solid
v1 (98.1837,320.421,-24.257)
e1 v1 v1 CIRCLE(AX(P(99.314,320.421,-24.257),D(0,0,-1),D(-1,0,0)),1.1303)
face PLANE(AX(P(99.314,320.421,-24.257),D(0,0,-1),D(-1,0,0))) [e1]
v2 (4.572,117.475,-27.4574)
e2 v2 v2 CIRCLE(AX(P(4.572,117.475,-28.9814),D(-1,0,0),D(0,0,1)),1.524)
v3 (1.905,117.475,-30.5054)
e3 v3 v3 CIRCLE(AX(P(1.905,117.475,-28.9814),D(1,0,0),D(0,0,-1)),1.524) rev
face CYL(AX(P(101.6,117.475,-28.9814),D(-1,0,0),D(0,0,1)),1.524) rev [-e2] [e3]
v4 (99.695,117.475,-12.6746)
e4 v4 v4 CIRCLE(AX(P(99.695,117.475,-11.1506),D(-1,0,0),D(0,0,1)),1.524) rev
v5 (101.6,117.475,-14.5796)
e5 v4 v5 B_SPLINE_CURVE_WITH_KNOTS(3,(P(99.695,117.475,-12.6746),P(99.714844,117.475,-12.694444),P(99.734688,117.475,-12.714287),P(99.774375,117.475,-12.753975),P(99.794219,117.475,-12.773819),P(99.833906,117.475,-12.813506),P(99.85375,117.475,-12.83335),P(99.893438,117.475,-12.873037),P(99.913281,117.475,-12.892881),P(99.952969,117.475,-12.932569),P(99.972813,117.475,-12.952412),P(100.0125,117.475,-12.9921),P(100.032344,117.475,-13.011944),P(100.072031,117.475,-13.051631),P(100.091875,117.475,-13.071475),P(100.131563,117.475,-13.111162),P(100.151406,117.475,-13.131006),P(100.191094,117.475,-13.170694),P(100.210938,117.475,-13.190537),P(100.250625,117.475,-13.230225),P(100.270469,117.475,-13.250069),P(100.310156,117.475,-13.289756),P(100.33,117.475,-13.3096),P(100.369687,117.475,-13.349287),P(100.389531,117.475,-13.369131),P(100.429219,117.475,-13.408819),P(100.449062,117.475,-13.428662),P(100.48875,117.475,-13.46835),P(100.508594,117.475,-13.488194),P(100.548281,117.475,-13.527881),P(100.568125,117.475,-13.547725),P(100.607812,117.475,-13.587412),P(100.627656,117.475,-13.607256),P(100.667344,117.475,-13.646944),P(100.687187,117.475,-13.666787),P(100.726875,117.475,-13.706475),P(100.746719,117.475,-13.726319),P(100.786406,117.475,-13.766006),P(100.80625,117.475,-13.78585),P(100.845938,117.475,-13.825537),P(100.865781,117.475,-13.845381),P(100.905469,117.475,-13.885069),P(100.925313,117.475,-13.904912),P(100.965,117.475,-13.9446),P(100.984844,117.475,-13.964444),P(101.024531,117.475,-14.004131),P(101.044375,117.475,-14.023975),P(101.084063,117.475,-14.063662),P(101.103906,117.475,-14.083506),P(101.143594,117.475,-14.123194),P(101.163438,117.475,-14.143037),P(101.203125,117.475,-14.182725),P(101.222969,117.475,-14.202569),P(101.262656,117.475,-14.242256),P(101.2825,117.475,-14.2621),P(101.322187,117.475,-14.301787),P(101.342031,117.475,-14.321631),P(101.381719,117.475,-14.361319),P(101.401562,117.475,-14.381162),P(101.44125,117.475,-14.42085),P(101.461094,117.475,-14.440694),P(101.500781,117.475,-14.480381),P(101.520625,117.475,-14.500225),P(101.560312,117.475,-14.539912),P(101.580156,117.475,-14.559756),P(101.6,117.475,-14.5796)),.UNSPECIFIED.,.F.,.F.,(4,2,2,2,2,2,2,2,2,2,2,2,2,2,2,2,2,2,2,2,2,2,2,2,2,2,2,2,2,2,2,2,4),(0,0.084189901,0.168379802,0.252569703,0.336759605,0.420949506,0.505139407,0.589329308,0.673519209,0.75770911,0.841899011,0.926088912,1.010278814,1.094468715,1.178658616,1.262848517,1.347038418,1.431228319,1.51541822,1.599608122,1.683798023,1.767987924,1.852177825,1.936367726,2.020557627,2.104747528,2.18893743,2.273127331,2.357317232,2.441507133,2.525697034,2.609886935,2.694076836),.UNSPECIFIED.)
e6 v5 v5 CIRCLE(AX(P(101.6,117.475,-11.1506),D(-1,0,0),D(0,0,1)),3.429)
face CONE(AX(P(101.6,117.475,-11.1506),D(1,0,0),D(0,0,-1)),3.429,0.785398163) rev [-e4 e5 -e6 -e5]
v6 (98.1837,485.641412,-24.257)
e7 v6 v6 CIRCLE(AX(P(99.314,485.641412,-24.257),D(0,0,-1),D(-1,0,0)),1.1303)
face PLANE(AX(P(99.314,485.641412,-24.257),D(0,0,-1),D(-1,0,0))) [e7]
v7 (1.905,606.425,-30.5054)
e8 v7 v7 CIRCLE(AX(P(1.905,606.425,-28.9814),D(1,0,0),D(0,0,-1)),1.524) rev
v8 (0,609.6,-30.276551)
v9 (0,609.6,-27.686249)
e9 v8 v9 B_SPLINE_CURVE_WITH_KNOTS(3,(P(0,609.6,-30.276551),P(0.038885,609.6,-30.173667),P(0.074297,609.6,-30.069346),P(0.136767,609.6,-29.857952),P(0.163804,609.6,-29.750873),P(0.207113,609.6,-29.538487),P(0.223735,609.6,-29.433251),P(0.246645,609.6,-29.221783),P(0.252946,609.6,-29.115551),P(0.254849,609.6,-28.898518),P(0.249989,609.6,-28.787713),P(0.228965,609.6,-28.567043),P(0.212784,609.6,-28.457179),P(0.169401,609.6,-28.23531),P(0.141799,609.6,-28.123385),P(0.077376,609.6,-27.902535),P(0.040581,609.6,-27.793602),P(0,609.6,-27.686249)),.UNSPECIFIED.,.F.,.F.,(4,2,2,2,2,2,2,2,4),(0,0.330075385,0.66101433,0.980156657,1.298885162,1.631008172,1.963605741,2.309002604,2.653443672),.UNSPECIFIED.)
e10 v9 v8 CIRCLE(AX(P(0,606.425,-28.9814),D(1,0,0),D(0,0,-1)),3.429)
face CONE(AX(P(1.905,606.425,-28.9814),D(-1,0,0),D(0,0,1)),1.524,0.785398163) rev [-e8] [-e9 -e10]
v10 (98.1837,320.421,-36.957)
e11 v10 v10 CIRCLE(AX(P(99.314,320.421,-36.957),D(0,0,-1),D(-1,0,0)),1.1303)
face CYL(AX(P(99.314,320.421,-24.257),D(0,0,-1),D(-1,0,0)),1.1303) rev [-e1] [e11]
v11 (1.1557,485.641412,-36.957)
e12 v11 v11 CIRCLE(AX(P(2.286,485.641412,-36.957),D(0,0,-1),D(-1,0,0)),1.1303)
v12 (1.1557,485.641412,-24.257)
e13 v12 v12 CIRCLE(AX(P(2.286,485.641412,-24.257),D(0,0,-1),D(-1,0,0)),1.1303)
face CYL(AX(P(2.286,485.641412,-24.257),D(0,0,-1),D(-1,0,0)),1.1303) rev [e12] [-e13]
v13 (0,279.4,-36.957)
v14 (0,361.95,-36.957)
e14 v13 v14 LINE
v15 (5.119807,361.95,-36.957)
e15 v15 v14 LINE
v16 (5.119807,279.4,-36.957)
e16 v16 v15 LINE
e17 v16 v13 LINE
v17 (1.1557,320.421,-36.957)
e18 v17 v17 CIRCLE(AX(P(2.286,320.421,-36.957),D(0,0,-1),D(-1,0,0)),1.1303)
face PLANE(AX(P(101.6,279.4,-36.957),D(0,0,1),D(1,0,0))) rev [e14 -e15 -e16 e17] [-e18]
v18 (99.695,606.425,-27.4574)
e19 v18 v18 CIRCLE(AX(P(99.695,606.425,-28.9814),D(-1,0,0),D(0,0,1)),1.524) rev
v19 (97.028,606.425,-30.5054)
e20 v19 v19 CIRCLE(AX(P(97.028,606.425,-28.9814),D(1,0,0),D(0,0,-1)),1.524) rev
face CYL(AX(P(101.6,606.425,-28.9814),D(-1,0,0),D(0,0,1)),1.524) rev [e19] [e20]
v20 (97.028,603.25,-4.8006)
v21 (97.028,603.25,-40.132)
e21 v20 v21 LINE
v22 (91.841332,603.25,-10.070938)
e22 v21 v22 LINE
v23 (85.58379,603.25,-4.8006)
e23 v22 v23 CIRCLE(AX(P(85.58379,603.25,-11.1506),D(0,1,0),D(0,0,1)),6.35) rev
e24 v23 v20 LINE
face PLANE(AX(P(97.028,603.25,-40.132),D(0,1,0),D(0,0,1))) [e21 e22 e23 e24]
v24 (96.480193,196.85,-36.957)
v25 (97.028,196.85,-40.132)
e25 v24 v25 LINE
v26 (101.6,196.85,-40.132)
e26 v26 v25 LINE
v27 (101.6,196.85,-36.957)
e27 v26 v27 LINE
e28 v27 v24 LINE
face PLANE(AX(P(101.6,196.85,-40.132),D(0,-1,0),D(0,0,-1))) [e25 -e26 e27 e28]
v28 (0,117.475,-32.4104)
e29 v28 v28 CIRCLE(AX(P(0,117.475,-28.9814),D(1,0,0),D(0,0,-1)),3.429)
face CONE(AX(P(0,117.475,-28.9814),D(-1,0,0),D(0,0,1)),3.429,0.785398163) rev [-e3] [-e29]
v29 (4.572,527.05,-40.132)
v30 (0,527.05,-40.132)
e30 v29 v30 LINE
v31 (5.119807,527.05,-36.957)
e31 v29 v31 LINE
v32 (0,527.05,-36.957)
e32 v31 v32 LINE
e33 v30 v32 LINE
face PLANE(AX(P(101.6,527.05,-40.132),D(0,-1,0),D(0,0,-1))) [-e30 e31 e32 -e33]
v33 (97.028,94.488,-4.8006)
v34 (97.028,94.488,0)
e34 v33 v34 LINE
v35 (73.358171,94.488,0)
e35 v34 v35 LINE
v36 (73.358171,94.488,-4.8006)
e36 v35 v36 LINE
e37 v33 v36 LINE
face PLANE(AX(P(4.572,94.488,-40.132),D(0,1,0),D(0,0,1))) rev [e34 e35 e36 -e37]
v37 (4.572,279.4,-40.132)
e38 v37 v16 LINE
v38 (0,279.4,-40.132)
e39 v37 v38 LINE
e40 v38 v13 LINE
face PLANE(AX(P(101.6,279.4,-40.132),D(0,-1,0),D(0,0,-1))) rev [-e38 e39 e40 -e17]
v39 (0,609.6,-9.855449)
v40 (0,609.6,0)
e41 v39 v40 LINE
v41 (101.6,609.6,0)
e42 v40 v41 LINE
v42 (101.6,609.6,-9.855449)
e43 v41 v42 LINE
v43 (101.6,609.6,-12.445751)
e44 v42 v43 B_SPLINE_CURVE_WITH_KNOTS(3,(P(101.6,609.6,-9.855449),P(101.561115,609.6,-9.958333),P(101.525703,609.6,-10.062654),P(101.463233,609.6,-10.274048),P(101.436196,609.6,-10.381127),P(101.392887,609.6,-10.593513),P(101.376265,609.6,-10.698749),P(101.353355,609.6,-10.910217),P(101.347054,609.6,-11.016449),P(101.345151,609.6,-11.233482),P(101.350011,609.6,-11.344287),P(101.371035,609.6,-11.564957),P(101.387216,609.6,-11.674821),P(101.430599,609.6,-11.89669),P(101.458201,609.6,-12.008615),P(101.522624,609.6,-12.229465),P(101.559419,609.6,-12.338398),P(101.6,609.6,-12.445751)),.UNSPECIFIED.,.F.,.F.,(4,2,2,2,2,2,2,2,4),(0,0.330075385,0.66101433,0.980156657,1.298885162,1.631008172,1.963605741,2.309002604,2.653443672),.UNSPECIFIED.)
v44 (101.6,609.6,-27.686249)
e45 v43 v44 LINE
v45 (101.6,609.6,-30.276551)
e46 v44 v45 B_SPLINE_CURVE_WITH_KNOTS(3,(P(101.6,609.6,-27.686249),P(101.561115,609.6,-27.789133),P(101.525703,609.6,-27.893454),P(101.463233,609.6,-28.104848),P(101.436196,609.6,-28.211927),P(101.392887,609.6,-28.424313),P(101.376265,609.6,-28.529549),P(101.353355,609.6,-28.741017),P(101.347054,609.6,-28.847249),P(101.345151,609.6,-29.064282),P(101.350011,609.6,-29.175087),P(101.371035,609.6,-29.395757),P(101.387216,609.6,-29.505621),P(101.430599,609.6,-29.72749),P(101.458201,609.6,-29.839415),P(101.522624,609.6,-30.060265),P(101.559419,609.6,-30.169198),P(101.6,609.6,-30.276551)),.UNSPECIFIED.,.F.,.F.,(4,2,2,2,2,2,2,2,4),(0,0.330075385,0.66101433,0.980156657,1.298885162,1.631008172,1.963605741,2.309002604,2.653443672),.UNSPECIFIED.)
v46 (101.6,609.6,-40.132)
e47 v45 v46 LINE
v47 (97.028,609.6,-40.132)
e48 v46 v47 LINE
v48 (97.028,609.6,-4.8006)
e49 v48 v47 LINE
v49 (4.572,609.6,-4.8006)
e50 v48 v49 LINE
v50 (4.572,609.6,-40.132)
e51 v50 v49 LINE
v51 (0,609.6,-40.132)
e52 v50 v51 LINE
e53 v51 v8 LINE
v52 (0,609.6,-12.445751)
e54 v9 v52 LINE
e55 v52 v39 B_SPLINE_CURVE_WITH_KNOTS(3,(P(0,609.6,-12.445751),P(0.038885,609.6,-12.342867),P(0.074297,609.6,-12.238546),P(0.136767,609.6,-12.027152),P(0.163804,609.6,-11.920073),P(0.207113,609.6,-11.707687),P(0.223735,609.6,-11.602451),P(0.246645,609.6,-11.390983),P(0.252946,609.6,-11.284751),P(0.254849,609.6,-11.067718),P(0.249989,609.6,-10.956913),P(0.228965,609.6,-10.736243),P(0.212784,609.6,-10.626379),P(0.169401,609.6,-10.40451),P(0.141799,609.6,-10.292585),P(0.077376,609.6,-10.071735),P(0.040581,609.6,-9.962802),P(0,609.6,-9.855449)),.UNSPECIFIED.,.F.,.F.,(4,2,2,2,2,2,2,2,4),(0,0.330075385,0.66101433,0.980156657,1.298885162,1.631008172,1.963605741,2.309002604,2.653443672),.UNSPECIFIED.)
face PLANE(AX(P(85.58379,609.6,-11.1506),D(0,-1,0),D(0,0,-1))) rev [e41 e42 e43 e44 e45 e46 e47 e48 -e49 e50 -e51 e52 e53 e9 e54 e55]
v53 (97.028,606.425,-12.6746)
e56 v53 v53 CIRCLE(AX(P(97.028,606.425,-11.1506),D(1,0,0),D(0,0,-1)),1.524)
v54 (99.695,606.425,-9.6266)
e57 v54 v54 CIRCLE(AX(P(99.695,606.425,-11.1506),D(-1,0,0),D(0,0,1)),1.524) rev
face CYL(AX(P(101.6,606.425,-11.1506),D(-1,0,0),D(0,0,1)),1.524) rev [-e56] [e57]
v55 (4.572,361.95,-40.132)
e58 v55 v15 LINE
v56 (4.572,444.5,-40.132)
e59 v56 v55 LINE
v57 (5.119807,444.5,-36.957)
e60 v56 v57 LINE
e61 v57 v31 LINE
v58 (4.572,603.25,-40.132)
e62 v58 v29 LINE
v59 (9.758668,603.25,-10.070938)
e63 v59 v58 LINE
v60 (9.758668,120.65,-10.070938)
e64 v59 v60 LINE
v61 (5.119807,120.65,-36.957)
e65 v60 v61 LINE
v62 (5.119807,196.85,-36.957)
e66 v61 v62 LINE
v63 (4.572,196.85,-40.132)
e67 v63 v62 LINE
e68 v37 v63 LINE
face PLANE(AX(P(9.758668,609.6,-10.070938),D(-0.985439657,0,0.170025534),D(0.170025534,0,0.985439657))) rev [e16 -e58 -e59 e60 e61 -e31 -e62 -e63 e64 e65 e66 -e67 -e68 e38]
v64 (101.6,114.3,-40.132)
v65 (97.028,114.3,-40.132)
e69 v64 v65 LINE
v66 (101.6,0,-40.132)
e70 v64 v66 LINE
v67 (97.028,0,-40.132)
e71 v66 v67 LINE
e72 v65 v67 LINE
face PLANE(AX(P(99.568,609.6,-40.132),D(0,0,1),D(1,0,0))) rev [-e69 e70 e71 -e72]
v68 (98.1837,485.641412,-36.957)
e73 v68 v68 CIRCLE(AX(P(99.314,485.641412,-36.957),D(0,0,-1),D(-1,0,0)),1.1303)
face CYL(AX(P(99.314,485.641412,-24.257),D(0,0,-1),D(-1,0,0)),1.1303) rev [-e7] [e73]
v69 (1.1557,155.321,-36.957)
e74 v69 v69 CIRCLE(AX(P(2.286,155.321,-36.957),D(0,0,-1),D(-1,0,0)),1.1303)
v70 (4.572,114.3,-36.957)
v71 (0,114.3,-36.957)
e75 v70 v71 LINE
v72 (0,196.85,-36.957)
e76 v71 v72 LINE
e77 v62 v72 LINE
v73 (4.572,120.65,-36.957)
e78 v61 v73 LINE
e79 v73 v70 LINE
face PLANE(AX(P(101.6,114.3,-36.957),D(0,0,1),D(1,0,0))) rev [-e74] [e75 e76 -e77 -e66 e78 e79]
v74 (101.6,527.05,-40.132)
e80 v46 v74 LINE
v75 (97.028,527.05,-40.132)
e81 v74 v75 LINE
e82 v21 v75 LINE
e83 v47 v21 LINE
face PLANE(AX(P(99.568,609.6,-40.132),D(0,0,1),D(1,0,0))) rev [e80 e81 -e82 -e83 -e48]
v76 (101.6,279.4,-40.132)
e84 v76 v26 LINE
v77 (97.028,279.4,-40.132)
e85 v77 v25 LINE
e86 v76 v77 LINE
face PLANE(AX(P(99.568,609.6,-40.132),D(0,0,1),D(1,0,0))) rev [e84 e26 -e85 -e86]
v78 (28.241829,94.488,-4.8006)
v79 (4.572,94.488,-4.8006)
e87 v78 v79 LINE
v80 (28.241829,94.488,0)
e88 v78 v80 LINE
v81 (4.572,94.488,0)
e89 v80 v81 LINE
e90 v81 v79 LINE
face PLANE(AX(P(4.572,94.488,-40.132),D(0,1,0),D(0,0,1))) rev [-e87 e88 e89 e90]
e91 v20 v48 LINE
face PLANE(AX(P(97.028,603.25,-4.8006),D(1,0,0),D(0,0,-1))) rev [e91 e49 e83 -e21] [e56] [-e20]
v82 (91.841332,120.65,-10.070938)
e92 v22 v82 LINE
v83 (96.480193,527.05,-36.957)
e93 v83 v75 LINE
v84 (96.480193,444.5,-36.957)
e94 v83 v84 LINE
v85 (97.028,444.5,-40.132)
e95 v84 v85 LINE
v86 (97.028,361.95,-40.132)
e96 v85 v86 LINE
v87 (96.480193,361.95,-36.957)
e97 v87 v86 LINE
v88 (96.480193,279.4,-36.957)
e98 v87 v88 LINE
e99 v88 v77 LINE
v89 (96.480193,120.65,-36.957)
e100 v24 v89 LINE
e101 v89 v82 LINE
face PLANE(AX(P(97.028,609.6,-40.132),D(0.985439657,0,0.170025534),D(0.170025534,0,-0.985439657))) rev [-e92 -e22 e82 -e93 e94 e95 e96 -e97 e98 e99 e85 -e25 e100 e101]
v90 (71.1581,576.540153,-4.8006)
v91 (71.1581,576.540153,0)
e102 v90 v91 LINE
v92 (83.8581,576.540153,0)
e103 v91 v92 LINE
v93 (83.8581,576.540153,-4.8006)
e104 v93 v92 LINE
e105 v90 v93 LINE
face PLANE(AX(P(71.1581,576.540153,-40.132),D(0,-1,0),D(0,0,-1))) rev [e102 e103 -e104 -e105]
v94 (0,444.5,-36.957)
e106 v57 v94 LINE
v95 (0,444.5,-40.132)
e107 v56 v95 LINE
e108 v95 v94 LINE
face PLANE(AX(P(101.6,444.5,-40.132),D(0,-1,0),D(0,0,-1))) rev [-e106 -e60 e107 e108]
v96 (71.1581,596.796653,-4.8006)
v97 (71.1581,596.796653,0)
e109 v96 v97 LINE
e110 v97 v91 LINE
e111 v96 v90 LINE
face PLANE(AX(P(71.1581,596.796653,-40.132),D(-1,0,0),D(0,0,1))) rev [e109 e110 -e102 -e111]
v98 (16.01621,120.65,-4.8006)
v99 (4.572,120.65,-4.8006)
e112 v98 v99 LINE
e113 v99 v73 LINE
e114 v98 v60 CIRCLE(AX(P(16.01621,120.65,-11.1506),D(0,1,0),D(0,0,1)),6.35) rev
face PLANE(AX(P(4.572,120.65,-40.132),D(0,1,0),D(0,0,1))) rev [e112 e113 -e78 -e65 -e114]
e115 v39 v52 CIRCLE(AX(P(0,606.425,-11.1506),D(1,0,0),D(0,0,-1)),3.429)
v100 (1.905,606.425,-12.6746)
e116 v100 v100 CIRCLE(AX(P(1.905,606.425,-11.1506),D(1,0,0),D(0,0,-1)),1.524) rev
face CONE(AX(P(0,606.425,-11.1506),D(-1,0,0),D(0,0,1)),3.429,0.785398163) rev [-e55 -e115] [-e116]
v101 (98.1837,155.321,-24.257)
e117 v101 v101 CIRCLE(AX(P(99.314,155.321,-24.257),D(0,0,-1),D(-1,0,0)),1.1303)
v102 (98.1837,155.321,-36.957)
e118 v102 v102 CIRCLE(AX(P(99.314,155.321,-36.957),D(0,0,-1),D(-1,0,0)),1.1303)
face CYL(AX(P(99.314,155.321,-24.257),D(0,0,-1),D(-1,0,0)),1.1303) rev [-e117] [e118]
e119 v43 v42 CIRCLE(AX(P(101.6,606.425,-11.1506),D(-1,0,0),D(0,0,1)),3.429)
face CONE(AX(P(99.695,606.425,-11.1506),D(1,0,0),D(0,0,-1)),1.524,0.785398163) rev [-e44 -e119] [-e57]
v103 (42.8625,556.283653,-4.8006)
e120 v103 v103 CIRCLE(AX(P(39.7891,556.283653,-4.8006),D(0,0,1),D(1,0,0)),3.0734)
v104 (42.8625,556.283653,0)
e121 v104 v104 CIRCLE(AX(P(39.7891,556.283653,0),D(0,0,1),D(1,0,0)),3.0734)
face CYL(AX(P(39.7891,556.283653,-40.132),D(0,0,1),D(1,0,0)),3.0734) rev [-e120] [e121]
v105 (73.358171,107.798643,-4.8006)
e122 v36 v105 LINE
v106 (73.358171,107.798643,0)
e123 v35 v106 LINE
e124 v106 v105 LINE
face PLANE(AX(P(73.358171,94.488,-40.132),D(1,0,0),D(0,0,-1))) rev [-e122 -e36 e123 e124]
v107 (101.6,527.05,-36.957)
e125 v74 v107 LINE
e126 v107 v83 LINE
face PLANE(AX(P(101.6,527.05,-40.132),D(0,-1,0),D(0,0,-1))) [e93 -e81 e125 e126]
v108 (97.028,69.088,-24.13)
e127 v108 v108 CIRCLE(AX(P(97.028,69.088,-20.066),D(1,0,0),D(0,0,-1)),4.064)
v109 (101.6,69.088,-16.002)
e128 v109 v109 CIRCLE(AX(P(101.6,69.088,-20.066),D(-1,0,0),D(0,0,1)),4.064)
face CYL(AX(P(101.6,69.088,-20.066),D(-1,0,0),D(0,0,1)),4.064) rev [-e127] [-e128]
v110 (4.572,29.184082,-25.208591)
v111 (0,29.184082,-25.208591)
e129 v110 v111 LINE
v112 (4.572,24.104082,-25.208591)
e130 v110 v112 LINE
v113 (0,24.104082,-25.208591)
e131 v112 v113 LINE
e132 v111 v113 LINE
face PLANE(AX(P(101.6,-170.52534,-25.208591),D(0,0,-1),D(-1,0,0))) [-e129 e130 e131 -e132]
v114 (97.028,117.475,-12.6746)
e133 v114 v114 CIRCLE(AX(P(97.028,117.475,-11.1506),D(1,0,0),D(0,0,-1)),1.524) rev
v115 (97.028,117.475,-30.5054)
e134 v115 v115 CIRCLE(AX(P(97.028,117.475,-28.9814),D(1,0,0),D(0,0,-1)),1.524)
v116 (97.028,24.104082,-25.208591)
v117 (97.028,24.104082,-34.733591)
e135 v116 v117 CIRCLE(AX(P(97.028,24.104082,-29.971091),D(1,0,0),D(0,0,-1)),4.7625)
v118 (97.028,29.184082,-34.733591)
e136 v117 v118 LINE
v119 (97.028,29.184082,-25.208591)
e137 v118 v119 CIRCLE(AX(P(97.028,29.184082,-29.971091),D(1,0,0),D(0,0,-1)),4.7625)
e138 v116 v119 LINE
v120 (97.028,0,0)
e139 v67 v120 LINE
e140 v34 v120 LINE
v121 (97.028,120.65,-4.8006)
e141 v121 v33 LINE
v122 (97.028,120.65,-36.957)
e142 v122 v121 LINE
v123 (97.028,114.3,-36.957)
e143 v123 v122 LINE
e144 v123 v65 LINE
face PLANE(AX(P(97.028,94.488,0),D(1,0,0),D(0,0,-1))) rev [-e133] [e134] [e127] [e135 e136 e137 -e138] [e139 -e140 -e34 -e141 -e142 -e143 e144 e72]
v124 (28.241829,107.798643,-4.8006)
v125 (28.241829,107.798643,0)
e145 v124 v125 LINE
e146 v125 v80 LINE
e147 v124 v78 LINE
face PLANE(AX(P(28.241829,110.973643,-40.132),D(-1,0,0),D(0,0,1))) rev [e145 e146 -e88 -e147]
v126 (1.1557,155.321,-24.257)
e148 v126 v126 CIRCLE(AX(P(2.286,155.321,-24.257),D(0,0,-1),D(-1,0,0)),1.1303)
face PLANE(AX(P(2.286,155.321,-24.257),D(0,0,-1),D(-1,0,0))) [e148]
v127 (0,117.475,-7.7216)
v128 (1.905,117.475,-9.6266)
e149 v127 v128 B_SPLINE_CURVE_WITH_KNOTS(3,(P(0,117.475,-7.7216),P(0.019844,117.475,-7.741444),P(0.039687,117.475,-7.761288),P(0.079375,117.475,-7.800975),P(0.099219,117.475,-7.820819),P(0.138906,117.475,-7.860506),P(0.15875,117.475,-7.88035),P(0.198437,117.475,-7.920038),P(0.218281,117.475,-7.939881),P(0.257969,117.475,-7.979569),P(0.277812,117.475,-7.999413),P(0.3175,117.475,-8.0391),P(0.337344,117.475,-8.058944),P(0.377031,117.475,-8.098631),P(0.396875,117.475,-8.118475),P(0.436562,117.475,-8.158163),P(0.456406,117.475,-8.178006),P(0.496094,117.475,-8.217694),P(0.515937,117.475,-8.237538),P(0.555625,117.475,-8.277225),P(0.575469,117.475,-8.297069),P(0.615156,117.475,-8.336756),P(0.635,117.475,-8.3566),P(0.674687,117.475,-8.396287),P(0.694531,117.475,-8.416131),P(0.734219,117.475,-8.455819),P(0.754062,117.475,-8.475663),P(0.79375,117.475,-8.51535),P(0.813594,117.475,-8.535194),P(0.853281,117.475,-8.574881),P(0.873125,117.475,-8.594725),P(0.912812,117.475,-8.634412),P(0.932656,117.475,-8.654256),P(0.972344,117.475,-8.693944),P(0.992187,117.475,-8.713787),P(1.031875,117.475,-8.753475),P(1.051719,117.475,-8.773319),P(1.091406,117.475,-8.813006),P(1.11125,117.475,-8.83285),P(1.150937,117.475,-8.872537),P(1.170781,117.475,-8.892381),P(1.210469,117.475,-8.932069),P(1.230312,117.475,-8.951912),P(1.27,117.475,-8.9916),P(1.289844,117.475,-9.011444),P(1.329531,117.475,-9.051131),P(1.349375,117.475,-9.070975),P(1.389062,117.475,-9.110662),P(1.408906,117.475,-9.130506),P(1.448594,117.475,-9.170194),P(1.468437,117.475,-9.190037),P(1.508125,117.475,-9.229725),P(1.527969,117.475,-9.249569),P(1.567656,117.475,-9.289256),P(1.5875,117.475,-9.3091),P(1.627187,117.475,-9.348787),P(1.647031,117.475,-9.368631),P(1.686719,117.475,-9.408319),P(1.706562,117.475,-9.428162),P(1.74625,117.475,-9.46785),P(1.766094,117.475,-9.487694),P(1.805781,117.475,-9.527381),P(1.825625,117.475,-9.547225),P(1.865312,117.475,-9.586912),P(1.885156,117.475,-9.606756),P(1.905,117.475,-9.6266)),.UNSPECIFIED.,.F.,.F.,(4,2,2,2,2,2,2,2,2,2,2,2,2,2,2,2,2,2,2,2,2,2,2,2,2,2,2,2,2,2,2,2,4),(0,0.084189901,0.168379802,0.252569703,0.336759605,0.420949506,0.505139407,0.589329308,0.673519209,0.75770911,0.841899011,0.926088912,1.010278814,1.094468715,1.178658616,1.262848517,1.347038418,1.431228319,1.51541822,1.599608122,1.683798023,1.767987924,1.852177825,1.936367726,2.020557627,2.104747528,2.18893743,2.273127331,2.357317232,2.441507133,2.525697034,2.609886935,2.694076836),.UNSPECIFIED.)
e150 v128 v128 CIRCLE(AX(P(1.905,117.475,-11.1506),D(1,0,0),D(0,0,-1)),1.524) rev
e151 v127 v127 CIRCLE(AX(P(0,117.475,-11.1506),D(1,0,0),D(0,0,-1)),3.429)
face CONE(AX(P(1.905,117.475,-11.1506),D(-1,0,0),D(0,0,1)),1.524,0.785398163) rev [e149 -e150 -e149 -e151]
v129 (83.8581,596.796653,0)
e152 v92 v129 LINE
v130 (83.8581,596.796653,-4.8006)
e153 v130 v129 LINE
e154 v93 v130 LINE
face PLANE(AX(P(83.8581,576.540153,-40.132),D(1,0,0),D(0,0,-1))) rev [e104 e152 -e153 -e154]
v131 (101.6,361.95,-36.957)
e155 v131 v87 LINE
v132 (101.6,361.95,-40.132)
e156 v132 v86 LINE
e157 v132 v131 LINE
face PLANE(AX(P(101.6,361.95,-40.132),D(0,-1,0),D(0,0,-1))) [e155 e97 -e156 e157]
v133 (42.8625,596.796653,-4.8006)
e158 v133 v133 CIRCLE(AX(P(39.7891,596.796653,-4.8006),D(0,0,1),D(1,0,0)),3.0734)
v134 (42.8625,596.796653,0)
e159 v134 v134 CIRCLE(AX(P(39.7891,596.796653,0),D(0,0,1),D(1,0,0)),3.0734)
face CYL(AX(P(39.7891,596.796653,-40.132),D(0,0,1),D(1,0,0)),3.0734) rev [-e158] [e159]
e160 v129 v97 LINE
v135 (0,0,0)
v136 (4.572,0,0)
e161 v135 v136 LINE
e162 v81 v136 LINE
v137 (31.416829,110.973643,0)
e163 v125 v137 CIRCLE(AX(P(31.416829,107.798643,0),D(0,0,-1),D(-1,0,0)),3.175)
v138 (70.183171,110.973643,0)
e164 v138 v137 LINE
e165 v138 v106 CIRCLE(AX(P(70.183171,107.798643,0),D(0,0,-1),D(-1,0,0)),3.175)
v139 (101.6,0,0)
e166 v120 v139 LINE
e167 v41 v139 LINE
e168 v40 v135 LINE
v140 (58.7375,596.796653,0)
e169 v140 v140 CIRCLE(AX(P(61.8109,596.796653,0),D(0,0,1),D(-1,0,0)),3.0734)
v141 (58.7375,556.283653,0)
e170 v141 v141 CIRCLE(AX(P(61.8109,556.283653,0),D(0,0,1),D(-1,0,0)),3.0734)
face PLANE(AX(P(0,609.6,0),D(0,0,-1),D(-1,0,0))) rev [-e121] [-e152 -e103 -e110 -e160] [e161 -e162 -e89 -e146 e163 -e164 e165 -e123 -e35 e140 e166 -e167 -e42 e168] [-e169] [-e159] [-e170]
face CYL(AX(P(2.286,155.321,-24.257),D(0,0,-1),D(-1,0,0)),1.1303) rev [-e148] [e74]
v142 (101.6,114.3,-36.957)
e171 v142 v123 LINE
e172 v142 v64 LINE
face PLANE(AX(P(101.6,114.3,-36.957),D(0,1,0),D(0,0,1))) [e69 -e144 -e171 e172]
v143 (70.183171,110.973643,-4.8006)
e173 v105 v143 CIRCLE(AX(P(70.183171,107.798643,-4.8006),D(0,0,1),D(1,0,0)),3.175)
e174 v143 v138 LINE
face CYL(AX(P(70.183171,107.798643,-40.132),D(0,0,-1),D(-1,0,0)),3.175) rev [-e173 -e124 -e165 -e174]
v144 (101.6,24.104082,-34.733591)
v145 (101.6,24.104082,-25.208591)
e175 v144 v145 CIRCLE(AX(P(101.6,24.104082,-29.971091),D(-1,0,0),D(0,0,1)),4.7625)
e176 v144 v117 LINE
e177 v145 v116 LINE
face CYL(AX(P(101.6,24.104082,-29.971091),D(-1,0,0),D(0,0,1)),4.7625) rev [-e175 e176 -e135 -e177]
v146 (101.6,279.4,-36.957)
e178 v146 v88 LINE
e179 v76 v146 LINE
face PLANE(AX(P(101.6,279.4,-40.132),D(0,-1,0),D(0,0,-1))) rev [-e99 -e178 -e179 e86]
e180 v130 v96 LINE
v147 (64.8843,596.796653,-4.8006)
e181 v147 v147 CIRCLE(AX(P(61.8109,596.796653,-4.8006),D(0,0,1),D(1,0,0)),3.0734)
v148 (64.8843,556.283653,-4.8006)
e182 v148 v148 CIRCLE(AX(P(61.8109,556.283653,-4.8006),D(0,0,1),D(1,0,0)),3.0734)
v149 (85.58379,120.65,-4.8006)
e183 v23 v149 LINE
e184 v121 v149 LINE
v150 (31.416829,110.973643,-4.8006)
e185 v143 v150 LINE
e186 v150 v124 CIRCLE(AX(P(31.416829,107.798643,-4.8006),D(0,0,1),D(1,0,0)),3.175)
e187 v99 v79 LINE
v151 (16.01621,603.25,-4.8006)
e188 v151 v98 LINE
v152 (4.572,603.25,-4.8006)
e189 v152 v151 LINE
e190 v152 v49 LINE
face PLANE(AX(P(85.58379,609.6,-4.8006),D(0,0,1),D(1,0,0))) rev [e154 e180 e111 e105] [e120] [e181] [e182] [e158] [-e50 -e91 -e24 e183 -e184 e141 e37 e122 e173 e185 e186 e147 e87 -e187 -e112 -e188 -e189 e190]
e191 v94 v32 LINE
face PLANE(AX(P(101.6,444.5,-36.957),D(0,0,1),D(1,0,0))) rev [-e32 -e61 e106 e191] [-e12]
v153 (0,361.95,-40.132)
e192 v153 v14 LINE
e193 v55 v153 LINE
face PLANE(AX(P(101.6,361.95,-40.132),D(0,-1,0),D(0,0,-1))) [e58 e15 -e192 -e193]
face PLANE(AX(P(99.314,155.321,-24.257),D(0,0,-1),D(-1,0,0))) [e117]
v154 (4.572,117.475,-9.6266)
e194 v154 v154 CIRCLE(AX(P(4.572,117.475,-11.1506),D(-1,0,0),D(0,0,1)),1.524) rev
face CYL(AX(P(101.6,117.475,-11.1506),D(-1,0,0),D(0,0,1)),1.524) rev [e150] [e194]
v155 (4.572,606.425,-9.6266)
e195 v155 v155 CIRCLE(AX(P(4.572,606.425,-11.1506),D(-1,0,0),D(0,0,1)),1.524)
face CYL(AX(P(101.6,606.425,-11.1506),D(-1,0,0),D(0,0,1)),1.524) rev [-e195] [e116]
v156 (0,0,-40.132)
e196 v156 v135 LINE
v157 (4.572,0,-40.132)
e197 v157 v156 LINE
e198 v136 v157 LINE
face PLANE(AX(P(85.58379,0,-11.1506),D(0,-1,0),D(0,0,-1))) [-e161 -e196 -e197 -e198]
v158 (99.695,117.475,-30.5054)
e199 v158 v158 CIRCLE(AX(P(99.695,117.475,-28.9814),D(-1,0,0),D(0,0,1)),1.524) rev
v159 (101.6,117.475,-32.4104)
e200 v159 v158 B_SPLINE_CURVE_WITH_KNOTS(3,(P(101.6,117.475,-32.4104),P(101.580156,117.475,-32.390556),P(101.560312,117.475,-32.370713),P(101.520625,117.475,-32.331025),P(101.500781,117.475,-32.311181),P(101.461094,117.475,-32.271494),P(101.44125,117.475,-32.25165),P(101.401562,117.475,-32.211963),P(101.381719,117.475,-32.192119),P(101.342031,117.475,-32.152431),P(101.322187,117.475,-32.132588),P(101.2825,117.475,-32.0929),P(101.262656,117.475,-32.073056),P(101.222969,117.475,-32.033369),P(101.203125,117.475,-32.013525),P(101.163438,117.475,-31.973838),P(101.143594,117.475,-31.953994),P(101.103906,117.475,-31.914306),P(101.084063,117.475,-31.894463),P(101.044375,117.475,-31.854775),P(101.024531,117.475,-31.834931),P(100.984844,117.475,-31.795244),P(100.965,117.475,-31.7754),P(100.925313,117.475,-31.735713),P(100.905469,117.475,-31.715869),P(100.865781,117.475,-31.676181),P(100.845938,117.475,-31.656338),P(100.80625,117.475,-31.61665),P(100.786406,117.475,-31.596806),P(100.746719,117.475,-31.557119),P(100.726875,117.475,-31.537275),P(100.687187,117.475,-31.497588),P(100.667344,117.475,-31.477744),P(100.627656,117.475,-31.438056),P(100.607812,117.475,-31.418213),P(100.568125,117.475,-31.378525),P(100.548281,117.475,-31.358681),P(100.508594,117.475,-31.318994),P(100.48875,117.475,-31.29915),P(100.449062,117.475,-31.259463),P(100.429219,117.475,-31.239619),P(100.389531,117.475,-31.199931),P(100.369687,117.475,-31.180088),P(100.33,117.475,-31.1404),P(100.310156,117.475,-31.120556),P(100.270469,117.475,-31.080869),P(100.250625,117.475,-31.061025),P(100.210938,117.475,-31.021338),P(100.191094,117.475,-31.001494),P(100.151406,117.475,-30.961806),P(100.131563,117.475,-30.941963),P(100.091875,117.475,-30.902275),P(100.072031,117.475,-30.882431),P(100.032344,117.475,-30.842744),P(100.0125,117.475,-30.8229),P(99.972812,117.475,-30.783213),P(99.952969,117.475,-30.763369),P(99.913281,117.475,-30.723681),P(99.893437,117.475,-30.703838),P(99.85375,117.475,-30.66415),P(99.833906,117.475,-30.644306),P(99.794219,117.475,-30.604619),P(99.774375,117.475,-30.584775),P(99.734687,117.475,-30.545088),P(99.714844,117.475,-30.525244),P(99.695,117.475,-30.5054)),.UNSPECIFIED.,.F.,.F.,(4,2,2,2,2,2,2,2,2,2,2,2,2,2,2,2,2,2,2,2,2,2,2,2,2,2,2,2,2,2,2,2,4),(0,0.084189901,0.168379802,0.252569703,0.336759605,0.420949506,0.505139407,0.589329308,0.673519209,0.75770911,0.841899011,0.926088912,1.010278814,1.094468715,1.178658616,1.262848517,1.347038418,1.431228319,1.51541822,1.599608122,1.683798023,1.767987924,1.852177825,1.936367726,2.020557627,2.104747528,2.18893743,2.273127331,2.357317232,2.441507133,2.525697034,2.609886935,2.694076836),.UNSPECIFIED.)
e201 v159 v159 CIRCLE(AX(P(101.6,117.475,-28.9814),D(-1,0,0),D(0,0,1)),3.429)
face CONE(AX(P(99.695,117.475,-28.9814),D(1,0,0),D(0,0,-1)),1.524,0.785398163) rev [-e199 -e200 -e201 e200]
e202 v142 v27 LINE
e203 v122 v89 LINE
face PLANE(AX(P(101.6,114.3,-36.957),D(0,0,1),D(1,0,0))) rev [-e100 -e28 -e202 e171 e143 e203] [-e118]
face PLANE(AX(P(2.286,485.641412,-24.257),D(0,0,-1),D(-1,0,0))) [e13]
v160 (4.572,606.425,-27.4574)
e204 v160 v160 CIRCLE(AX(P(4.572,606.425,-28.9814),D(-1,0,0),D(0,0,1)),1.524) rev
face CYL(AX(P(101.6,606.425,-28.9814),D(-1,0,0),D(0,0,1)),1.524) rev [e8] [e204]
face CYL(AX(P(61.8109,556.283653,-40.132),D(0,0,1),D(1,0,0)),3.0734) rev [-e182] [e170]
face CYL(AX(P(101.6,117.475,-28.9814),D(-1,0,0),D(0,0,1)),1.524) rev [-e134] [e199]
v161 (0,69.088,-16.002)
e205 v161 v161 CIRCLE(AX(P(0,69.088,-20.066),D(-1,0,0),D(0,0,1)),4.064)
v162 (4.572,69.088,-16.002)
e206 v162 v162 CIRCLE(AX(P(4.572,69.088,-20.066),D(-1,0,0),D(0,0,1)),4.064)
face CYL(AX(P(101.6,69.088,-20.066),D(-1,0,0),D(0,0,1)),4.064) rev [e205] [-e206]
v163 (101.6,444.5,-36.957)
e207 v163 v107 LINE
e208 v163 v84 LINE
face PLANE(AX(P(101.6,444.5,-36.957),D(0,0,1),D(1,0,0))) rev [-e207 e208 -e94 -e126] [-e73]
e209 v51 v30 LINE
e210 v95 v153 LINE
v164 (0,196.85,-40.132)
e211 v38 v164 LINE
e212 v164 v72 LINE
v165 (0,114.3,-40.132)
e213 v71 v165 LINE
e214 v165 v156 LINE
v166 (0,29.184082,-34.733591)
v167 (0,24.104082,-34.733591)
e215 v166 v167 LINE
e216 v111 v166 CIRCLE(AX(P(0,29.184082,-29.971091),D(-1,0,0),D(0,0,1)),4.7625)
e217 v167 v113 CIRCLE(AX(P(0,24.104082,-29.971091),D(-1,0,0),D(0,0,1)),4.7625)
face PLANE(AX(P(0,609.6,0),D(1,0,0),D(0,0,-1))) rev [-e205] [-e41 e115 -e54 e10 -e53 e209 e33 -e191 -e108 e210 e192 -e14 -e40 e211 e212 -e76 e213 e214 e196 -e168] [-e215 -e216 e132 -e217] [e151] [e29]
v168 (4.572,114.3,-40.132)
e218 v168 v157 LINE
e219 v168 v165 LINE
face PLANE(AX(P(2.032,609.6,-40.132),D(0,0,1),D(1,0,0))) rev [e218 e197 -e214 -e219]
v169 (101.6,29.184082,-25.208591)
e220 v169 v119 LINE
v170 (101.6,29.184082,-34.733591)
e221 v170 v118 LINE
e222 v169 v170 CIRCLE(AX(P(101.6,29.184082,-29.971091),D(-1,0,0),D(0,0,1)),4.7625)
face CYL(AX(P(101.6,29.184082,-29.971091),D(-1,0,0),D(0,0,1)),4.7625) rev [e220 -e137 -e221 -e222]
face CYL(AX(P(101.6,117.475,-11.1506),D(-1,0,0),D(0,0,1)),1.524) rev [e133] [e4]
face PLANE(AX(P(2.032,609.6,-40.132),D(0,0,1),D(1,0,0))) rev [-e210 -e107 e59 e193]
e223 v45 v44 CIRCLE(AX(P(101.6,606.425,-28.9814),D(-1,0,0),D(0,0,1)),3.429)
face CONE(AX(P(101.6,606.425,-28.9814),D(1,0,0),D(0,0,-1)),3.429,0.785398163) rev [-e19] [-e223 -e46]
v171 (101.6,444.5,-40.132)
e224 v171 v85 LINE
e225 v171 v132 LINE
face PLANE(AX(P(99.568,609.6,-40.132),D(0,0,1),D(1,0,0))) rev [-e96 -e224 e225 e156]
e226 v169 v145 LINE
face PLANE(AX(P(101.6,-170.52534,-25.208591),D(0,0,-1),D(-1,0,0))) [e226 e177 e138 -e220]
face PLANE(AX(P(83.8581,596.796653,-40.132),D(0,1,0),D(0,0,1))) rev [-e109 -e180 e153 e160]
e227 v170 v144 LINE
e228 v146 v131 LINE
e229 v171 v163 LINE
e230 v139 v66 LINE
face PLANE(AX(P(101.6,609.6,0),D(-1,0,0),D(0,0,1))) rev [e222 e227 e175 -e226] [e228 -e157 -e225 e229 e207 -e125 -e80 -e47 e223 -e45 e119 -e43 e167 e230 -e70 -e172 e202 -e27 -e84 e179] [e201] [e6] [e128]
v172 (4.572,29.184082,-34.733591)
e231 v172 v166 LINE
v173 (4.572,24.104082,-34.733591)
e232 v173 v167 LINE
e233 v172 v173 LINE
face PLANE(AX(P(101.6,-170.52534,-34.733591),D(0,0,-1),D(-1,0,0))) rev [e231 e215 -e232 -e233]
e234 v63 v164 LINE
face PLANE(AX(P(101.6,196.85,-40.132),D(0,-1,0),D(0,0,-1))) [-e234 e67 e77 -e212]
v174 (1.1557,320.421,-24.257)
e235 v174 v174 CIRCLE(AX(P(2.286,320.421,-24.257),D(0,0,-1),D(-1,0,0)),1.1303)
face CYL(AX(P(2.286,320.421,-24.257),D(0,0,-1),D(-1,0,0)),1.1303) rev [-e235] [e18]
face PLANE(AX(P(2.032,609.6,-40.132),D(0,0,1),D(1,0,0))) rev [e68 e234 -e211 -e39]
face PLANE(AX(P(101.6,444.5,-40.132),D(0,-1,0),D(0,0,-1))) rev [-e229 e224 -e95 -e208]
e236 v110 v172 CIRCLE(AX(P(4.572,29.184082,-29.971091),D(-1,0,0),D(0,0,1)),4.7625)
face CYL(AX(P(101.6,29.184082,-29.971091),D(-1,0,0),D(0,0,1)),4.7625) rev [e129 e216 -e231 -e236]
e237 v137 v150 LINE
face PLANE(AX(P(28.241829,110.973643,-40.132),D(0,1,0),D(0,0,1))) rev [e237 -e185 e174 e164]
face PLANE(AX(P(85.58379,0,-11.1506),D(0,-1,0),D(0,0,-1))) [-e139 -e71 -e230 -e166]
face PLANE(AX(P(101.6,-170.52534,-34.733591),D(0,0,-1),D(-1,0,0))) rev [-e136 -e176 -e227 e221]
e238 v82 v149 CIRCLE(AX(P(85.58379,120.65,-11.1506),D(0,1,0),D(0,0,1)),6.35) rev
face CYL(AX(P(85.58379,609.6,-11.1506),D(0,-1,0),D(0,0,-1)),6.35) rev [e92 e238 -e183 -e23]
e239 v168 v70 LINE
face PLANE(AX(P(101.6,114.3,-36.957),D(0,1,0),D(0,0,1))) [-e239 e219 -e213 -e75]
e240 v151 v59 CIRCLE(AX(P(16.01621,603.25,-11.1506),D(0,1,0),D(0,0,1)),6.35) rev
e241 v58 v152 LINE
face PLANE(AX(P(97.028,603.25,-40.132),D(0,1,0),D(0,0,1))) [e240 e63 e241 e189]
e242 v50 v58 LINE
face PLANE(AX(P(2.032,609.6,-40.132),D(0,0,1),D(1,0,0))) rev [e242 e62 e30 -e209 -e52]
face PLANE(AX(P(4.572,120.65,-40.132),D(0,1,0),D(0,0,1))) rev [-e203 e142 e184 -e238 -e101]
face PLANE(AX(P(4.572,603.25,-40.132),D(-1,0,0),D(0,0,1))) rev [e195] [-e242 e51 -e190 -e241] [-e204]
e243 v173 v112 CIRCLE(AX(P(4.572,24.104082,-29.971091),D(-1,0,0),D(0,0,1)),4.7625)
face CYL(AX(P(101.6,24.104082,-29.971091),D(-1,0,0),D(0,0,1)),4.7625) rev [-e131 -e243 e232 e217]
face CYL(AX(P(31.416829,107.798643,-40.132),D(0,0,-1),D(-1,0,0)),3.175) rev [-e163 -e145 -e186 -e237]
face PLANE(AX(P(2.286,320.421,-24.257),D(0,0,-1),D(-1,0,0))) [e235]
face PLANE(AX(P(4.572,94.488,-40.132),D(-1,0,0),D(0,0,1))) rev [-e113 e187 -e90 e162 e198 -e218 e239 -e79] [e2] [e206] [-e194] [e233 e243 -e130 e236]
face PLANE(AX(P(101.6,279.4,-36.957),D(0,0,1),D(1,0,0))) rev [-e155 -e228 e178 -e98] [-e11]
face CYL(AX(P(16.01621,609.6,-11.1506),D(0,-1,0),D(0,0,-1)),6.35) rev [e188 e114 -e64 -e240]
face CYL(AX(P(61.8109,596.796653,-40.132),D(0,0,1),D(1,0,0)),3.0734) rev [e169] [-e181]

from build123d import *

# Parameters (mm, degrees)
BOSS_EXTRUDE1_DEPTH = 609.6
SKETCH5_W           = 92.456
SKETCH5_H           = 40.132
CUT_EXTRUDE4_DEPTH  = 94.488
SKETCH6_R           = 3.0734
SKETCH6_W           = 45.116342256
SKETCH6_H           = 16.485642943
SKETCH6_W_2         = 12.7
SKETCH6_H_2         = 20.2565
CUT_EXTRUDE5_DEPTH  = 620.310340156
SKETCH4_R           = 4.064
SKETCH4_W           = 3.175
SKETCH4_H           = 82.55
SKETCH4_R_2         = 1.524
CUT_EXTRUDE3_DEPTH  = 620.310340156
SKETCH7_W           = 92.456
SKETCH7_H           = 35.3314
CUT_EXTRUDE6_DEPTH  = 6.35
SKETCH8_W           = 92.456
SKETCH8_H           = 35.3314
CUT_EXTRUDE7_DEPTH  = 26.162
SKETCH10_R          = 1.1303
CUT_EXTRUDE8_DEPTH  = 12.7
CHAMFER1_SIZE       = 1.905
FILLET1_R           = 3.175


with BuildPart() as part:
    # Sketch1 → Boss-Extrude1 (new body)
    with BuildSketch(Plane(origin=(0, 0, 0), x_dir=(1, 0, 0), z_dir=(0, 1, 0))):
        with BuildLine():
            Line((0, 0), (0, 40.132))
            Line((0, 40.132), (2.032, 40.132))
            Line((2.032, 40.132), (4.572, 40.132))
            Line((4.572, 40.132), (9.758667803, 10.070937859))
            ThreePointArc((9.758667803, 10.070937859), (11.925571203, 6.293730916), (16.016209625, 4.8006))
            Line((16.016209625, 4.8006), (85.583790375, 4.8006))
            ThreePointArc((85.583790375, 4.8006), (89.674428797, 6.293730916), (91.841332197, 10.070937859))
            Line((91.841332197, 10.070937859), (97.028, 40.132))
            Line((97.028, 40.132), (99.568, 40.132))
            Line((99.568, 40.132), (101.6, 40.132))
            Line((101.6, 40.132), (101.6, 0))
            Line((101.6, 0), (0, 0))
        make_face()
    extrude(amount=BOSS_EXTRUDE1_DEPTH)

    # Sketch5 → Cut-Extrude4 (cut)
    with BuildSketch(Plane.XZ):
        with Locations((50.8, -20.066)):
            Rectangle(SKETCH5_W, SKETCH5_H)
    extrude(amount=-CUT_EXTRUDE4_DEPTH, mode=Mode.SUBTRACT)

    # Sketch6 → Cut-Extrude5 (cut, through all)
    with BuildSketch(Plane.XY):
        with Locations((39.7891, 596.796653012)):
            Circle(SKETCH6_R)
        with Locations((39.7891, 556.283653012)):
            Circle(SKETCH6_R)
        with Locations((61.8109, 556.283653012)):
            Circle(SKETCH6_R)
        with Locations((61.8109, 596.796653012)):
            Circle(SKETCH6_R)
        with Locations((50.8, 102.730821472)):
            Rectangle(SKETCH6_W, SKETCH6_H)
        with Locations((77.5081, 586.668403012)):
            Rectangle(SKETCH6_W_2, SKETCH6_H_2)
    extrude(amount=-CUT_EXTRUDE5_DEPTH, mode=Mode.SUBTRACT)

    # Sketch4 → Cut-Extrude3 (cut, through all)
    with BuildSketch(Plane.ZY):
        with BuildLine():
            Line((-25.208591254, 24.104081866), (-25.208591254, 29.184081866))
            ThreePointArc((-25.208591254, 29.184081866), (-29.971091254, 33.946581866), (-34.733591254, 29.184081866))
            Line((-34.733591254, 29.184081866), (-34.733591254, 24.104081866))
            ThreePointArc((-34.733591254, 24.104081866), (-29.971091254, 19.341581866), (-25.208591254, 24.104081866))
        make_face()
        with Locations((-20.066, 69.088)):
            Circle(SKETCH4_R)
        with Locations((-38.5445, 155.575)):
            Rectangle(SKETCH4_W, SKETCH4_H)
        with Locations((-38.5445, 320.675)):
            Rectangle(SKETCH4_W, SKETCH4_H)
        with Locations((-38.5445, 485.775)):
            Rectangle(SKETCH4_W, SKETCH4_H)
        with Locations(Location((-28.9814, 117.475, 0), (0, 0, 180))):
            Circle(SKETCH4_R_2)
        with Locations((-11.1506, 117.475)):
            Circle(SKETCH4_R_2)
        with Locations(Location((-11.1506, 606.425, 0), (0, 0, 315.108108431))):
            Circle(SKETCH4_R_2)
        with Locations((-28.9814, 606.425)):
            Circle(SKETCH4_R_2)
    extrude(amount=-CUT_EXTRUDE3_DEPTH, mode=Mode.SUBTRACT)

    # Sketch7 → Cut-Extrude6 (cut)
    with BuildSketch(Plane(origin=(0, 609.6, 0), x_dir=(1, 0, 0), z_dir=(0, 1, 0))):
        with Locations((50.8, 22.4663)):
            Rectangle(SKETCH7_W, SKETCH7_H)
    extrude(amount=-CUT_EXTRUDE6_DEPTH, mode=Mode.SUBTRACT)

    # Sketch8 → Cut-Extrude7 (cut)
    with BuildSketch(Plane.XZ.offset(-94.488)):
        with Locations((50.8, -22.4663)):
            Rectangle(SKETCH8_W, SKETCH8_H)
    extrude(amount=-CUT_EXTRUDE7_DEPTH, mode=Mode.SUBTRACT)

    # Sketch10 → Cut-Extrude8 (cut)
    with BuildSketch(Plane(origin=(0, 0, -36.957), x_dir=(-1, 0, 0), z_dir=(0, 0, -1))):
        with Locations((-2.286, 155.321)):
            Circle(SKETCH10_R)
        with Locations((-2.286, 320.421)):
            Circle(SKETCH10_R)
        with Locations((-2.286, 485.64141222)):
            Circle(SKETCH10_R)
        with Locations((-99.314, 155.321)):
            Circle(SKETCH10_R)
        with Locations((-99.314, 320.421)):
            Circle(SKETCH10_R)
        with Locations((-99.314, 485.64141222)):
            Circle(SKETCH10_R)
    extrude(amount=-CUT_EXTRUDE8_DEPTH, mode=Mode.SUBTRACT)

    # Chamfer1
    # the kernel refuses this chamfer: 1.905 mm, written as the material it takes off along each edge
    with BuildSketch(Plane(origin=(0, 117.475, -28.9814), x_dir=(0, 0, -1), z_dir=(0, 1, 0))) as chamfer1_piece_1:
        Polygon((1.524, -CHAMFER1_SIZE), (1.524 + CHAMFER1_SIZE, 0), (1.524, 0), align=None)
    revolve(axis=Axis((0, 117.475, -28.9814), (-1, 0, 0)), mode=Mode.SUBTRACT)
    with BuildSketch(Plane(origin=(101.6, 117.475, -28.9814), x_dir=(0, 0, -1), z_dir=(0, 1, 0))) as chamfer1_piece_2:
        Polygon((1.524, CHAMFER1_SIZE), (1.524 + CHAMFER1_SIZE, 0), (1.524, 0), align=None)
    revolve(axis=Axis((101.6, 117.475, -28.9814), (-1, 0, 0)), mode=Mode.SUBTRACT)
    with BuildSketch(Plane(origin=(101.6, 117.475, -11.1506), x_dir=(0, 0, 1), z_dir=(0, -1, 0))) as chamfer1_piece_3:
        Polygon((1.524, CHAMFER1_SIZE), (1.524 + CHAMFER1_SIZE, 0), (1.524, 0), align=None)
    revolve(axis=Axis((101.6, 117.475, -11.1506), (-1, 0, 0)), mode=Mode.SUBTRACT)
    with BuildSketch(Plane(origin=(0, 117.475, -11.1506), x_dir=(0, 0, 1), z_dir=(0, -1, 0))) as chamfer1_piece_4:
        Polygon((1.524, -CHAMFER1_SIZE), (1.524 + CHAMFER1_SIZE, 0), (1.524, 0), align=None)
    revolve(axis=Axis((0, 117.475, -11.1506), (-1, 0, 0)), mode=Mode.SUBTRACT)
    with BuildSketch(Plane(origin=(0, 606.425, -11.1506), x_dir=(0, -0.7057713201939051, 0.7084397247414577), z_dir=(0, -0.7084397247414577, -0.7057713201939051))) as chamfer1_piece_5:
        Polygon((1.524, -CHAMFER1_SIZE), (1.524 + CHAMFER1_SIZE, 0), (1.524, 0), align=None)
    revolve(axis=Axis((0, 606.425, -11.1506), (-1, 0, 0)), mode=Mode.SUBTRACT)
    with BuildSketch(Plane(origin=(101.6, 606.425, -11.1506), x_dir=(0, -0.7057713201939051, 0.7084397247414577), z_dir=(0, -0.7084397247414577, -0.7057713201939051))) as chamfer1_piece_6:
        Polygon((1.524 + CHAMFER1_SIZE, 0), (1.524, CHAMFER1_SIZE), (1.524, 0), align=None)
    revolve(axis=Axis((101.6, 606.425, -11.1506), (-1, 0, 0)), mode=Mode.SUBTRACT)
    with BuildSketch(Plane(origin=(101.6, 606.425, -28.9814), x_dir=(0, 0, 1), z_dir=(0, -1, 0))) as chamfer1_piece_7:
        Polygon((1.524 + CHAMFER1_SIZE, 0), (1.524, CHAMFER1_SIZE), (1.524, 0), align=None)
    revolve(axis=Axis((101.6, 606.425, -28.9814), (-1, 0, 0)), mode=Mode.SUBTRACT)
    with BuildSketch(Plane(origin=(0, 606.425, -28.9814), x_dir=(0, 0, 1), z_dir=(0, -1, 0))) as chamfer1_piece_8:
        Polygon((1.524, -CHAMFER1_SIZE), (1.524 + CHAMFER1_SIZE, 0), (1.524, 0), align=None)
    revolve(axis=Axis((0, 606.425, -28.9814), (-1, 0, 0)), mode=Mode.SUBTRACT)

    # Fillet1
    fillet1_edges = [part.edges().sort_by_distance(p)[0] for p in [
        (28.241828872, 110.973642943, -2.4003),
        (73.358171128, 110.973642943, -2.4003),
    ]]
    fillet(fillet1_edges, radius=FILLET1_R)


solid = part.part
